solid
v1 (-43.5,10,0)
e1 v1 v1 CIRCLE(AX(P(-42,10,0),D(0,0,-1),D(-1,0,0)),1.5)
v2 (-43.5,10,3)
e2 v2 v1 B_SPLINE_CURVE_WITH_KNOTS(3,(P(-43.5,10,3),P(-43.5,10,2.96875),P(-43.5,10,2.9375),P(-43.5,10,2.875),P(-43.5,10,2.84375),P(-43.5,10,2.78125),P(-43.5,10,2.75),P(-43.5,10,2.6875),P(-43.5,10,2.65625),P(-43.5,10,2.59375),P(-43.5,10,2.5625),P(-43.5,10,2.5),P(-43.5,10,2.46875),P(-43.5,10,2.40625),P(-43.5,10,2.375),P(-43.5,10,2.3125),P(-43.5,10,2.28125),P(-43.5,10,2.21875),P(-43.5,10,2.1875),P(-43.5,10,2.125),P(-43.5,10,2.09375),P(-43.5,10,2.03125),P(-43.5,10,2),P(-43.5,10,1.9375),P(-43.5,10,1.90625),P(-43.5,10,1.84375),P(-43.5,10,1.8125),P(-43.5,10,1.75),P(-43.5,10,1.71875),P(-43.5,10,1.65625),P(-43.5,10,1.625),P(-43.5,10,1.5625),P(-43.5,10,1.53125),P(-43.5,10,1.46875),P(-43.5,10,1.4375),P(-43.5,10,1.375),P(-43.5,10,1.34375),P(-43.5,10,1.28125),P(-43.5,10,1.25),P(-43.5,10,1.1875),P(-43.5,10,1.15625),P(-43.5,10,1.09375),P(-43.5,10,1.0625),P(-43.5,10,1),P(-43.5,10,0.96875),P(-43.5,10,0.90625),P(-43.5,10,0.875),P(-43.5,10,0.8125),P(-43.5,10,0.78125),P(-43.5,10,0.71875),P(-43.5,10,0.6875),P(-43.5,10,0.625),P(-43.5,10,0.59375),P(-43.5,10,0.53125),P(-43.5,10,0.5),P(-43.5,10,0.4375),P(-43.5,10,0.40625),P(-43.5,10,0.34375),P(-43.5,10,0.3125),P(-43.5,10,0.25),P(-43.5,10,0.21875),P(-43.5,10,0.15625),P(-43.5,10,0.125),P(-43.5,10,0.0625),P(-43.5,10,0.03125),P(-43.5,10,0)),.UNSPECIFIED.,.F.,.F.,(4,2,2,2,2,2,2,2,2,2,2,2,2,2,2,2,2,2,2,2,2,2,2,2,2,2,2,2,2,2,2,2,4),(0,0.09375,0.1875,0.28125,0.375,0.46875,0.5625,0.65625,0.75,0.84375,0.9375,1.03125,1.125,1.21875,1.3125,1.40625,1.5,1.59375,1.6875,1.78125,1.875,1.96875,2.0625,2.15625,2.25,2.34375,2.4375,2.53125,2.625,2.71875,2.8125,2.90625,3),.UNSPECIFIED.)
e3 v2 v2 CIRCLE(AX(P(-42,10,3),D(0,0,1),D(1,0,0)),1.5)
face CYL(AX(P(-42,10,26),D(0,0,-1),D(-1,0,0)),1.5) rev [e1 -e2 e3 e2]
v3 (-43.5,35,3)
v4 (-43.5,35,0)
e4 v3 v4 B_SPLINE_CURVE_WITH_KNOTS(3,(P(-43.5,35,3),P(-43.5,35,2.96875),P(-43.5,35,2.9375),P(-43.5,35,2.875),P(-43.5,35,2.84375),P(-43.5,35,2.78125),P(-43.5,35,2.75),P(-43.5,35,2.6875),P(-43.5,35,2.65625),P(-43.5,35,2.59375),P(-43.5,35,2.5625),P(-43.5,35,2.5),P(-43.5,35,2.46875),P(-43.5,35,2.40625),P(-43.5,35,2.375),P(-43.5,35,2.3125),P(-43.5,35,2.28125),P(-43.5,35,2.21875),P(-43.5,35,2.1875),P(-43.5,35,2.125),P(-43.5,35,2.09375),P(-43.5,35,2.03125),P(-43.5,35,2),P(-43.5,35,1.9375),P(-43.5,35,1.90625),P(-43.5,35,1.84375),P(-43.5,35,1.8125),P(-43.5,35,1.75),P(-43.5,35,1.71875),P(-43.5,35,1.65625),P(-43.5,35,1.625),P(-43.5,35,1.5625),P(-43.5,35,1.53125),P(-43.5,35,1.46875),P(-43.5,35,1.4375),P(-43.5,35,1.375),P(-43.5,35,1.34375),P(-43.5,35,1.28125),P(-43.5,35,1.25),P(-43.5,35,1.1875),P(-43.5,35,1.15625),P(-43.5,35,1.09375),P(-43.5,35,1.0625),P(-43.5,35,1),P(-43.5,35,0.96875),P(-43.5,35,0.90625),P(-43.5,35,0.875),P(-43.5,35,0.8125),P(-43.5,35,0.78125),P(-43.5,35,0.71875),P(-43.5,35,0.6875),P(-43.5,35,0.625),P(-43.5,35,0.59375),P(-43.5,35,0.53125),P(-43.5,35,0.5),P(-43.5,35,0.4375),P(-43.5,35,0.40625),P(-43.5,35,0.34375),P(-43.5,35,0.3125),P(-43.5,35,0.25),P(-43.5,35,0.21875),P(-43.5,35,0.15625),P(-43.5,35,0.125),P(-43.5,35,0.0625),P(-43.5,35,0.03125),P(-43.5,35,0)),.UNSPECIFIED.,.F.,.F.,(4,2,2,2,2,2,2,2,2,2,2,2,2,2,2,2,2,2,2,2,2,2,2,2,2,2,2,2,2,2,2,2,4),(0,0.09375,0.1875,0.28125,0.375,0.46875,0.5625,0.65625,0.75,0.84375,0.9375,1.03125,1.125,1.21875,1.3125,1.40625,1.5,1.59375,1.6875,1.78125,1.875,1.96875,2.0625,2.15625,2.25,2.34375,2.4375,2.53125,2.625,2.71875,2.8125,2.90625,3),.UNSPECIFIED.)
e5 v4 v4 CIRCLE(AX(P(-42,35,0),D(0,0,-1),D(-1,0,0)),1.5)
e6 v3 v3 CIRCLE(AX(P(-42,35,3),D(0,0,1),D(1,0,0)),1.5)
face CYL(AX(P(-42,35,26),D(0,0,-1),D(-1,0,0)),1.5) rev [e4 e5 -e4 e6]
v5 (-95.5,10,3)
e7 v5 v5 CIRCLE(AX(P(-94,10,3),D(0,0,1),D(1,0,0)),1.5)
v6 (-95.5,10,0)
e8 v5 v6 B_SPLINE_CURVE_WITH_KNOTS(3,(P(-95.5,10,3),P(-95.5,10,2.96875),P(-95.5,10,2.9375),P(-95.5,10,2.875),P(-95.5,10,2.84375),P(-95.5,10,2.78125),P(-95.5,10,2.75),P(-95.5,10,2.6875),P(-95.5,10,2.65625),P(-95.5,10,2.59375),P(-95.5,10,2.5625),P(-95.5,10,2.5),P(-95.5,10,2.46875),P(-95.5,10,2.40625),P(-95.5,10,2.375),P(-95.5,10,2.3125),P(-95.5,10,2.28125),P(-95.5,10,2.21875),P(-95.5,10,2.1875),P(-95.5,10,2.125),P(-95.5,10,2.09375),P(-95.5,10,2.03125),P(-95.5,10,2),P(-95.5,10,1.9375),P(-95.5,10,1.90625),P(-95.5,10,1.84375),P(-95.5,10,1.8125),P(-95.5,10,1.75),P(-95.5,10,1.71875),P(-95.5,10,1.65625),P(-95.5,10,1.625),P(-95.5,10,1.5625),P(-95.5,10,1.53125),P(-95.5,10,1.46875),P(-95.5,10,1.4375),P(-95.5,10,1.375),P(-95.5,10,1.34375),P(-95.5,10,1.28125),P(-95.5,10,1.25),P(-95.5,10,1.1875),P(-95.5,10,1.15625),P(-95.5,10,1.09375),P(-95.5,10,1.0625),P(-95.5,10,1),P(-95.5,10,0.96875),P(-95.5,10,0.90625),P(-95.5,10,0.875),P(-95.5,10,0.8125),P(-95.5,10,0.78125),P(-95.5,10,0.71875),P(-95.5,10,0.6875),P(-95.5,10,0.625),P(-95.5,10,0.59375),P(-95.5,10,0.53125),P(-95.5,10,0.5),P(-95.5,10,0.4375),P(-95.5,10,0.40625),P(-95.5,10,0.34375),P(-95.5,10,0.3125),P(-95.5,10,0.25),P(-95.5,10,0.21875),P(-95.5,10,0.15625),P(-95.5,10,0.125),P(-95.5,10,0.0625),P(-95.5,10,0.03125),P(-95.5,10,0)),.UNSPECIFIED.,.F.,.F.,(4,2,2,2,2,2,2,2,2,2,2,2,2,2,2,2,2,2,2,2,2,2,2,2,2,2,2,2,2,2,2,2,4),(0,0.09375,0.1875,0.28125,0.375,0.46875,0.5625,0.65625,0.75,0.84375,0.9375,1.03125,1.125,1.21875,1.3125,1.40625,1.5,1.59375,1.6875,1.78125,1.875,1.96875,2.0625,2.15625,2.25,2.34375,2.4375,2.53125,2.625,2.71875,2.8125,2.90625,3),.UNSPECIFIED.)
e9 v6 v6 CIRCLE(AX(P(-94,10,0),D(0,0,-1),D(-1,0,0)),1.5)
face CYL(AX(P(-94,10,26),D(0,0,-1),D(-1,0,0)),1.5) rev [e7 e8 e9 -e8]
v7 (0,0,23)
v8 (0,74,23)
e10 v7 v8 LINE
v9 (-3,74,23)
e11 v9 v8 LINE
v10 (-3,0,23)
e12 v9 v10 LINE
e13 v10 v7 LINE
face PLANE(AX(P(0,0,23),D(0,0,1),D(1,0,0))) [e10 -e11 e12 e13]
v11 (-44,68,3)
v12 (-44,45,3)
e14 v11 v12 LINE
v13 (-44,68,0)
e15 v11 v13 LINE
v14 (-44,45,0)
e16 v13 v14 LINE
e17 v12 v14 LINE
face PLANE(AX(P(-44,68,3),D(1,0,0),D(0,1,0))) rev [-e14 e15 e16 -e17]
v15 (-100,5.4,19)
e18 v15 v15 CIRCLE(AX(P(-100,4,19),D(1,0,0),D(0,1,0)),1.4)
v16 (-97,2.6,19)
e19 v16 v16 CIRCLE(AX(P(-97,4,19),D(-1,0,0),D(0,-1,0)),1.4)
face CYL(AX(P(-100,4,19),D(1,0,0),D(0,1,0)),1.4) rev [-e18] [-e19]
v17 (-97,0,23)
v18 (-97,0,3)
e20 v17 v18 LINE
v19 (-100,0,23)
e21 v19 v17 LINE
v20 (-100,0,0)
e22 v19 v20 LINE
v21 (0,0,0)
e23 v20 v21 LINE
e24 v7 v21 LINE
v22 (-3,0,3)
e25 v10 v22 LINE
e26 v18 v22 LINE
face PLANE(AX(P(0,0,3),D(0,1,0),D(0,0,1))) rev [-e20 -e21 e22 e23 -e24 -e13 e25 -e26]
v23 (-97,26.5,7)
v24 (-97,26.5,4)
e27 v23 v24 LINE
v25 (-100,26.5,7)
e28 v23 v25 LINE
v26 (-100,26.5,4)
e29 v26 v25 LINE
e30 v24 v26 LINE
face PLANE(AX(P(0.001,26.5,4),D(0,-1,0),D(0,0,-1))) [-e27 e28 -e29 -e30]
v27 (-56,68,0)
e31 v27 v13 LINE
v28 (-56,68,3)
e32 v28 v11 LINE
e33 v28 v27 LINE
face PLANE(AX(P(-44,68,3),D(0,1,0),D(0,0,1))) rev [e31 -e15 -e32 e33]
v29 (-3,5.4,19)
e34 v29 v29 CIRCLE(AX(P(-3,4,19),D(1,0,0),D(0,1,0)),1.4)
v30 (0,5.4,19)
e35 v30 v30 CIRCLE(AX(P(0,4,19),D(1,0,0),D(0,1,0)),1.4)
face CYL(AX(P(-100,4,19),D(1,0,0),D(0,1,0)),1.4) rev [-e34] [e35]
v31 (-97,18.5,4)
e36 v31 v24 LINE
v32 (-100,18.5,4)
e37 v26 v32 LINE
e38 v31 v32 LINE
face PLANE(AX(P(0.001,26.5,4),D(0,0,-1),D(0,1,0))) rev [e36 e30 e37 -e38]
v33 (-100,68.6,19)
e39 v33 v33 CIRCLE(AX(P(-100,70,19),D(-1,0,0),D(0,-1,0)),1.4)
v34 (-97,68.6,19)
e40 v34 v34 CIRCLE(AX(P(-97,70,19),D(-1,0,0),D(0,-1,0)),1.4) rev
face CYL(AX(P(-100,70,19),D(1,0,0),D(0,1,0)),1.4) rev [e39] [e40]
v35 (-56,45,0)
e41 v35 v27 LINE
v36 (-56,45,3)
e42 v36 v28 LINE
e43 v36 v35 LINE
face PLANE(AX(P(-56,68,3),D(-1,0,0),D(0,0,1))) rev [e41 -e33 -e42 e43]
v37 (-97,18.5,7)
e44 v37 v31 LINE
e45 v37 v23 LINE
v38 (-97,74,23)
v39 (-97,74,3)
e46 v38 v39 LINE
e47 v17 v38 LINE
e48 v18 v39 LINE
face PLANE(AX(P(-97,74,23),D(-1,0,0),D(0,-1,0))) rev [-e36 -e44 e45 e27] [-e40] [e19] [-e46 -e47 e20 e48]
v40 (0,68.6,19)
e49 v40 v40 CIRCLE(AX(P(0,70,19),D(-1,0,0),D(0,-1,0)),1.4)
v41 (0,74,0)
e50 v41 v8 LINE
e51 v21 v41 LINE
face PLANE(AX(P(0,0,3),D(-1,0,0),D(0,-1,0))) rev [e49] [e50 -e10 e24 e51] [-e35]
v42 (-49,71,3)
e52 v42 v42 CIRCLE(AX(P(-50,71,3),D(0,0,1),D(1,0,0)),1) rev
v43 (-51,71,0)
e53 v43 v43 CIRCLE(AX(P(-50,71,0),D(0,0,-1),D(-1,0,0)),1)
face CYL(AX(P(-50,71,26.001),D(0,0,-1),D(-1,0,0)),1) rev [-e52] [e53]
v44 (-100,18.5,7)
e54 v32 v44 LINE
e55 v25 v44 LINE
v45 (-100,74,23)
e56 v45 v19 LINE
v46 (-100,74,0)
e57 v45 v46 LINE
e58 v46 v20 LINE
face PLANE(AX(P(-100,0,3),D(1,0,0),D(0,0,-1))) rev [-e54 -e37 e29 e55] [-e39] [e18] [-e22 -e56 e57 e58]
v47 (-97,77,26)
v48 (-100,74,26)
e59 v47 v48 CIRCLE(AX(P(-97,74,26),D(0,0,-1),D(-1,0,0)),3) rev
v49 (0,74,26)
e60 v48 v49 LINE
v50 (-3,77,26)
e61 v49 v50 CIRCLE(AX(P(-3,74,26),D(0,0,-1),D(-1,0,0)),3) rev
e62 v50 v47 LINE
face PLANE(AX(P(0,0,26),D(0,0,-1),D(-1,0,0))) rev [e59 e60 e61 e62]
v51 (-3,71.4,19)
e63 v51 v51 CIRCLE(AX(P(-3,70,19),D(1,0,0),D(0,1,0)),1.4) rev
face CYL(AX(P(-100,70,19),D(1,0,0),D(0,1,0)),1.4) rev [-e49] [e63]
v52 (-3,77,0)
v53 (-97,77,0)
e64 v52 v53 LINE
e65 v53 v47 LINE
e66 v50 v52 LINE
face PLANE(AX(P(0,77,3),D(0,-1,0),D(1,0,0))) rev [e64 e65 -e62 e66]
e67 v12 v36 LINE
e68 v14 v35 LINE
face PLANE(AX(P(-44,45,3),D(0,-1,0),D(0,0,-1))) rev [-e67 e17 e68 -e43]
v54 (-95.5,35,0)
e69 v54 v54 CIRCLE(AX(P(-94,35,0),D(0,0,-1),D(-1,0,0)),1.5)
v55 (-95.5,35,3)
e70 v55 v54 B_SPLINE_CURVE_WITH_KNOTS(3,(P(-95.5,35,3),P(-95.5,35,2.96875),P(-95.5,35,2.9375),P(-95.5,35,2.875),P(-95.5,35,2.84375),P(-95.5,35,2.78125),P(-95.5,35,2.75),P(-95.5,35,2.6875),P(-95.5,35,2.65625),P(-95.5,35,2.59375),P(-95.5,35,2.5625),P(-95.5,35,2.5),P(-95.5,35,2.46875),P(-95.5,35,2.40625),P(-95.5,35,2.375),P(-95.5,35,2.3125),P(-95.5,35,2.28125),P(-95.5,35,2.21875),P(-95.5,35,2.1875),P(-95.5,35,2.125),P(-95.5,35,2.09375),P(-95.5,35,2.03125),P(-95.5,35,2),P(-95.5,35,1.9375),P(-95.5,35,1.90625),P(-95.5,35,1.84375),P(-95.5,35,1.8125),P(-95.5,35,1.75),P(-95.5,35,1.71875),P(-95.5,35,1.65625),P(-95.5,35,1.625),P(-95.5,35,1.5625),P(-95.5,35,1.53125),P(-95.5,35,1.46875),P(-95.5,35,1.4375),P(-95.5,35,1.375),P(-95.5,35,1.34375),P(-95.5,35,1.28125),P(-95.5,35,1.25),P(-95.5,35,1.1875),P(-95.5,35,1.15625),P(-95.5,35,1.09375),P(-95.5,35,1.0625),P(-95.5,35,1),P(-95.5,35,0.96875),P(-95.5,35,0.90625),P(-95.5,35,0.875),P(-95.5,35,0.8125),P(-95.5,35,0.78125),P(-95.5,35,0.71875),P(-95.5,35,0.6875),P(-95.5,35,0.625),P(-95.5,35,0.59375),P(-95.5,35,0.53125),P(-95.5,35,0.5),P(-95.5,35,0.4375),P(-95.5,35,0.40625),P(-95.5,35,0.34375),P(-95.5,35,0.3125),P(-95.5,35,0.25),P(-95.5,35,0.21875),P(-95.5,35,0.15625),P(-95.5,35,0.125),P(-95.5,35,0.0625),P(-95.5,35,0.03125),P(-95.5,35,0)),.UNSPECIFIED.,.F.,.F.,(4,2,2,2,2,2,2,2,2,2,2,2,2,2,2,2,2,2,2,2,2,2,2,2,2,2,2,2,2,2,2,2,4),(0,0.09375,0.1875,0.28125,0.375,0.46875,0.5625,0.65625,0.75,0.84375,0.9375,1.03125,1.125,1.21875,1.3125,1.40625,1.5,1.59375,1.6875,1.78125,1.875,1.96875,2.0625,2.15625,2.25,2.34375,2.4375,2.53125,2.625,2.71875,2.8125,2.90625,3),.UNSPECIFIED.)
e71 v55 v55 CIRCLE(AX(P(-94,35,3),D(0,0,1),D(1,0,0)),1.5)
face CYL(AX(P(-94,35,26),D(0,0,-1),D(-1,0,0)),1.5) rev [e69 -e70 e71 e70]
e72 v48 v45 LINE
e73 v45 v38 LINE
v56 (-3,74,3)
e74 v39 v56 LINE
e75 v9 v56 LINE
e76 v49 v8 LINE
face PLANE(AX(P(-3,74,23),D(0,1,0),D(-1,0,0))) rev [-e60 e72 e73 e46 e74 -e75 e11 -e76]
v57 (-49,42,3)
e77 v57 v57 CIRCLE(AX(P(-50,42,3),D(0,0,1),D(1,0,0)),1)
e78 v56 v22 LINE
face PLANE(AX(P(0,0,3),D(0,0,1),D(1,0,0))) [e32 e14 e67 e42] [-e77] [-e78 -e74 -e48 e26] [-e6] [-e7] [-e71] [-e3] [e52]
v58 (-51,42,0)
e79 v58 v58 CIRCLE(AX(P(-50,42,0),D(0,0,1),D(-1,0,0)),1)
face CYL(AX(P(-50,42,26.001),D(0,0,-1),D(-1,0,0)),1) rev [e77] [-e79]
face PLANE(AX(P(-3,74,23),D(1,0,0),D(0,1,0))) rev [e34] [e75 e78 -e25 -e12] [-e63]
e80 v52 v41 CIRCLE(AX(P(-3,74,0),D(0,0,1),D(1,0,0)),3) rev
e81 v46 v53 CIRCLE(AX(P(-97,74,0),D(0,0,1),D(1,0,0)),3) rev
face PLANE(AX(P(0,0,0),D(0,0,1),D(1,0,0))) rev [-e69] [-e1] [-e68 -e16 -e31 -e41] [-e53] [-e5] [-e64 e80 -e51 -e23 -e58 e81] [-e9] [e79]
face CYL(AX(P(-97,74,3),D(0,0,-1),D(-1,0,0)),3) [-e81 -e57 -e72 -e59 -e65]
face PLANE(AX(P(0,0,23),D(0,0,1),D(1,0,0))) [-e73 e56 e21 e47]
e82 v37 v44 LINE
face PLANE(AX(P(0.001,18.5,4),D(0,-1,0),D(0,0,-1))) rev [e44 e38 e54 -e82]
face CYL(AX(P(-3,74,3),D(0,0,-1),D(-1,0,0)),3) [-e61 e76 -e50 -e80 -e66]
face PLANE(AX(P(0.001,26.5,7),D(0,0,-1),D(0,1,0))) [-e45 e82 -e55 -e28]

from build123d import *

# Parameters (mm, degrees)
SKETCH1_W            = 100
SKETCH1_H            = 77
BOSS_EXTRUDE1_DEPTH  = 3
BOSS_EXTRUDE2_DEPTH  = 20
SKETCH3_W            = 100
SKETCH3_H            = 3
BOSS_EXTRUDE3_DEPTH  = 3
SKETCH4_W            = 12
SKETCH4_H            = 23
CUT_EXTRUDE1_DEPTH   = 3
SKETCH5_R            = 1.5
CUT_EXTRUDE2_DEPTH   = 129.860389569
LPATTERN1_COUNT      = 2
LPATTERN1_PITCH      = 25
LPATTERN1_COUNT_DIR2 = 2
LPATTERN1_PITCH_DIR2 = 52
SKETCH6_R            = 1.4
CUT_EXTRUDE3_DEPTH   = 129.860389569
CUT_EXTRUDE4_REACH   = 130.86
SKETCH7_W            = 3
SKETCH7_H            = 8
CUT_EXTRUDE5_REACH   = 130.86
SKETCH9_R            = 1
FILLET1_R            = 3


with BuildPart() as part:
    # Sketch1 → Boss-Extrude1 (new body)
    with BuildSketch(Plane.XY):
        with Locations((-50, 38.5)):
            Rectangle(SKETCH1_W, SKETCH1_H)
    extrude(amount=BOSS_EXTRUDE1_DEPTH)

    # Sketch2 → Boss-Extrude2 (add)
    with BuildSketch(Plane.XY.offset(3)):
        Polygon((-100, 77), (-97, 77), (-3, 77), (0, 77), (0, 0), (-3, 0), (-3, 74), (-97, 74), (-97, 0), (-100, 0), align=None)
    extrude(amount=BOSS_EXTRUDE2_DEPTH)

    # Sketch3 → Boss-Extrude3 (add)
    with BuildSketch(Plane.XY.offset(23)):
        with Locations((-50, 75.5)):
            Rectangle(SKETCH3_W, SKETCH3_H)
    extrude(amount=BOSS_EXTRUDE3_DEPTH)

    # Sketch4 → Cut-Extrude1 (cut)
    with BuildSketch(Plane(origin=(0, 0, 0), x_dir=(-1, 0, 0), z_dir=(0, 0, -1))):
        with Locations((50, 56.5)):
            Rectangle(SKETCH4_W, SKETCH4_H)
    extrude(amount=-CUT_EXTRUDE1_DEPTH, mode=Mode.SUBTRACT)

    # Sketch5 → Cut-Extrude2 (cut, through all)
    with BuildSketch(Plane(origin=(0, 0, 0), x_dir=(-1, 0, 0), z_dir=(0, 0, -1))):
        with Locations((94, 10)):
            Circle(SKETCH5_R)
    cut_extrude2 = extrude(amount=-CUT_EXTRUDE2_DEPTH, mode=Mode.SUBTRACT)

    # LPattern1: Cut-Extrude2 2 × 2
    with Locations(*[(j * LPATTERN1_PITCH_DIR2, i * LPATTERN1_PITCH, 0) for i in range(LPATTERN1_COUNT) for j in range(LPATTERN1_COUNT_DIR2) if (i, j) != (0, 0)]):
        add(cut_extrude2, mode=Mode.SUBTRACT)

    # Sketch6 → Cut-Extrude3 (cut, through all)
    with BuildSketch(Plane(origin=(0, 0, 0), x_dir=(0, 0, -1), z_dir=(1, 0, 0))):
        with Locations(Location((-19, 4, 0), (0, 0, 90))):
            Circle(SKETCH6_R)
    cut_extrude3 = extrude(amount=-CUT_EXTRUDE3_DEPTH, mode=Mode.SUBTRACT)

    # Sketch7 → Cut-Extrude4 (cut, up to next)
    with BuildSketch(Plane.ZY.offset(100), mode=Mode.PRIVATE) as cut_extrude4_sk1:
        with Locations((5.5, 22.5)):
            Rectangle(SKETCH7_W, SKETCH7_H)
    cut_extrude4_tool1 = extrude(cut_extrude4_sk1.sketch, amount=-CUT_EXTRUDE4_REACH, mode=Mode.PRIVATE) & part.part
    add(cut_extrude4_tool1.solids().sort_by_distance((-100, 22.5, 5.5))[0], mode=Mode.SUBTRACT)

    # Sketch9 → Cut-Extrude5 (cut, up to next)
    with BuildSketch(Plane(origin=(0, 0, 0), x_dir=(-1, 0, 0), z_dir=(0, 0, -1)), mode=Mode.PRIVATE) as cut_extrude5_sk1:
        with Locations((50, 71)):
            Circle(SKETCH9_R)
    cut_extrude5_tool1 = extrude(cut_extrude5_sk1.sketch, amount=-CUT_EXTRUDE5_REACH, mode=Mode.PRIVATE) & part.part
    cut_extrude5 = cut_extrude5_tool1.solids().sort_by_distance((-50, 71, 0))[0]
    add(cut_extrude5, mode=Mode.SUBTRACT)

    # Mirror1: Cut-Extrude5 across plane
    add(cut_extrude5.mirror(Plane(origin=(0, 56.5, 0), x_dir=(0, 0, 1), z_dir=(0, -1, 0))), mode=Mode.SUBTRACT)

    # Mirror2: Cut-Extrude3 across plane
    add(cut_extrude3.mirror(Plane(origin=(0, 37, 0), x_dir=(0, 0, 1), z_dir=(0, -1, 0))), mode=Mode.SUBTRACT)

    # Fillet1
    fillet1_edges = [part.edges().sort_by_distance(p)[0] for p in [
        (0, 77, 13),
        (-100, 77, 13),
    ]]
    fillet(fillet1_edges, radius=FILLET1_R - 0.0001)  # a hair under: the kernel refuses the full size


solid = part.part
